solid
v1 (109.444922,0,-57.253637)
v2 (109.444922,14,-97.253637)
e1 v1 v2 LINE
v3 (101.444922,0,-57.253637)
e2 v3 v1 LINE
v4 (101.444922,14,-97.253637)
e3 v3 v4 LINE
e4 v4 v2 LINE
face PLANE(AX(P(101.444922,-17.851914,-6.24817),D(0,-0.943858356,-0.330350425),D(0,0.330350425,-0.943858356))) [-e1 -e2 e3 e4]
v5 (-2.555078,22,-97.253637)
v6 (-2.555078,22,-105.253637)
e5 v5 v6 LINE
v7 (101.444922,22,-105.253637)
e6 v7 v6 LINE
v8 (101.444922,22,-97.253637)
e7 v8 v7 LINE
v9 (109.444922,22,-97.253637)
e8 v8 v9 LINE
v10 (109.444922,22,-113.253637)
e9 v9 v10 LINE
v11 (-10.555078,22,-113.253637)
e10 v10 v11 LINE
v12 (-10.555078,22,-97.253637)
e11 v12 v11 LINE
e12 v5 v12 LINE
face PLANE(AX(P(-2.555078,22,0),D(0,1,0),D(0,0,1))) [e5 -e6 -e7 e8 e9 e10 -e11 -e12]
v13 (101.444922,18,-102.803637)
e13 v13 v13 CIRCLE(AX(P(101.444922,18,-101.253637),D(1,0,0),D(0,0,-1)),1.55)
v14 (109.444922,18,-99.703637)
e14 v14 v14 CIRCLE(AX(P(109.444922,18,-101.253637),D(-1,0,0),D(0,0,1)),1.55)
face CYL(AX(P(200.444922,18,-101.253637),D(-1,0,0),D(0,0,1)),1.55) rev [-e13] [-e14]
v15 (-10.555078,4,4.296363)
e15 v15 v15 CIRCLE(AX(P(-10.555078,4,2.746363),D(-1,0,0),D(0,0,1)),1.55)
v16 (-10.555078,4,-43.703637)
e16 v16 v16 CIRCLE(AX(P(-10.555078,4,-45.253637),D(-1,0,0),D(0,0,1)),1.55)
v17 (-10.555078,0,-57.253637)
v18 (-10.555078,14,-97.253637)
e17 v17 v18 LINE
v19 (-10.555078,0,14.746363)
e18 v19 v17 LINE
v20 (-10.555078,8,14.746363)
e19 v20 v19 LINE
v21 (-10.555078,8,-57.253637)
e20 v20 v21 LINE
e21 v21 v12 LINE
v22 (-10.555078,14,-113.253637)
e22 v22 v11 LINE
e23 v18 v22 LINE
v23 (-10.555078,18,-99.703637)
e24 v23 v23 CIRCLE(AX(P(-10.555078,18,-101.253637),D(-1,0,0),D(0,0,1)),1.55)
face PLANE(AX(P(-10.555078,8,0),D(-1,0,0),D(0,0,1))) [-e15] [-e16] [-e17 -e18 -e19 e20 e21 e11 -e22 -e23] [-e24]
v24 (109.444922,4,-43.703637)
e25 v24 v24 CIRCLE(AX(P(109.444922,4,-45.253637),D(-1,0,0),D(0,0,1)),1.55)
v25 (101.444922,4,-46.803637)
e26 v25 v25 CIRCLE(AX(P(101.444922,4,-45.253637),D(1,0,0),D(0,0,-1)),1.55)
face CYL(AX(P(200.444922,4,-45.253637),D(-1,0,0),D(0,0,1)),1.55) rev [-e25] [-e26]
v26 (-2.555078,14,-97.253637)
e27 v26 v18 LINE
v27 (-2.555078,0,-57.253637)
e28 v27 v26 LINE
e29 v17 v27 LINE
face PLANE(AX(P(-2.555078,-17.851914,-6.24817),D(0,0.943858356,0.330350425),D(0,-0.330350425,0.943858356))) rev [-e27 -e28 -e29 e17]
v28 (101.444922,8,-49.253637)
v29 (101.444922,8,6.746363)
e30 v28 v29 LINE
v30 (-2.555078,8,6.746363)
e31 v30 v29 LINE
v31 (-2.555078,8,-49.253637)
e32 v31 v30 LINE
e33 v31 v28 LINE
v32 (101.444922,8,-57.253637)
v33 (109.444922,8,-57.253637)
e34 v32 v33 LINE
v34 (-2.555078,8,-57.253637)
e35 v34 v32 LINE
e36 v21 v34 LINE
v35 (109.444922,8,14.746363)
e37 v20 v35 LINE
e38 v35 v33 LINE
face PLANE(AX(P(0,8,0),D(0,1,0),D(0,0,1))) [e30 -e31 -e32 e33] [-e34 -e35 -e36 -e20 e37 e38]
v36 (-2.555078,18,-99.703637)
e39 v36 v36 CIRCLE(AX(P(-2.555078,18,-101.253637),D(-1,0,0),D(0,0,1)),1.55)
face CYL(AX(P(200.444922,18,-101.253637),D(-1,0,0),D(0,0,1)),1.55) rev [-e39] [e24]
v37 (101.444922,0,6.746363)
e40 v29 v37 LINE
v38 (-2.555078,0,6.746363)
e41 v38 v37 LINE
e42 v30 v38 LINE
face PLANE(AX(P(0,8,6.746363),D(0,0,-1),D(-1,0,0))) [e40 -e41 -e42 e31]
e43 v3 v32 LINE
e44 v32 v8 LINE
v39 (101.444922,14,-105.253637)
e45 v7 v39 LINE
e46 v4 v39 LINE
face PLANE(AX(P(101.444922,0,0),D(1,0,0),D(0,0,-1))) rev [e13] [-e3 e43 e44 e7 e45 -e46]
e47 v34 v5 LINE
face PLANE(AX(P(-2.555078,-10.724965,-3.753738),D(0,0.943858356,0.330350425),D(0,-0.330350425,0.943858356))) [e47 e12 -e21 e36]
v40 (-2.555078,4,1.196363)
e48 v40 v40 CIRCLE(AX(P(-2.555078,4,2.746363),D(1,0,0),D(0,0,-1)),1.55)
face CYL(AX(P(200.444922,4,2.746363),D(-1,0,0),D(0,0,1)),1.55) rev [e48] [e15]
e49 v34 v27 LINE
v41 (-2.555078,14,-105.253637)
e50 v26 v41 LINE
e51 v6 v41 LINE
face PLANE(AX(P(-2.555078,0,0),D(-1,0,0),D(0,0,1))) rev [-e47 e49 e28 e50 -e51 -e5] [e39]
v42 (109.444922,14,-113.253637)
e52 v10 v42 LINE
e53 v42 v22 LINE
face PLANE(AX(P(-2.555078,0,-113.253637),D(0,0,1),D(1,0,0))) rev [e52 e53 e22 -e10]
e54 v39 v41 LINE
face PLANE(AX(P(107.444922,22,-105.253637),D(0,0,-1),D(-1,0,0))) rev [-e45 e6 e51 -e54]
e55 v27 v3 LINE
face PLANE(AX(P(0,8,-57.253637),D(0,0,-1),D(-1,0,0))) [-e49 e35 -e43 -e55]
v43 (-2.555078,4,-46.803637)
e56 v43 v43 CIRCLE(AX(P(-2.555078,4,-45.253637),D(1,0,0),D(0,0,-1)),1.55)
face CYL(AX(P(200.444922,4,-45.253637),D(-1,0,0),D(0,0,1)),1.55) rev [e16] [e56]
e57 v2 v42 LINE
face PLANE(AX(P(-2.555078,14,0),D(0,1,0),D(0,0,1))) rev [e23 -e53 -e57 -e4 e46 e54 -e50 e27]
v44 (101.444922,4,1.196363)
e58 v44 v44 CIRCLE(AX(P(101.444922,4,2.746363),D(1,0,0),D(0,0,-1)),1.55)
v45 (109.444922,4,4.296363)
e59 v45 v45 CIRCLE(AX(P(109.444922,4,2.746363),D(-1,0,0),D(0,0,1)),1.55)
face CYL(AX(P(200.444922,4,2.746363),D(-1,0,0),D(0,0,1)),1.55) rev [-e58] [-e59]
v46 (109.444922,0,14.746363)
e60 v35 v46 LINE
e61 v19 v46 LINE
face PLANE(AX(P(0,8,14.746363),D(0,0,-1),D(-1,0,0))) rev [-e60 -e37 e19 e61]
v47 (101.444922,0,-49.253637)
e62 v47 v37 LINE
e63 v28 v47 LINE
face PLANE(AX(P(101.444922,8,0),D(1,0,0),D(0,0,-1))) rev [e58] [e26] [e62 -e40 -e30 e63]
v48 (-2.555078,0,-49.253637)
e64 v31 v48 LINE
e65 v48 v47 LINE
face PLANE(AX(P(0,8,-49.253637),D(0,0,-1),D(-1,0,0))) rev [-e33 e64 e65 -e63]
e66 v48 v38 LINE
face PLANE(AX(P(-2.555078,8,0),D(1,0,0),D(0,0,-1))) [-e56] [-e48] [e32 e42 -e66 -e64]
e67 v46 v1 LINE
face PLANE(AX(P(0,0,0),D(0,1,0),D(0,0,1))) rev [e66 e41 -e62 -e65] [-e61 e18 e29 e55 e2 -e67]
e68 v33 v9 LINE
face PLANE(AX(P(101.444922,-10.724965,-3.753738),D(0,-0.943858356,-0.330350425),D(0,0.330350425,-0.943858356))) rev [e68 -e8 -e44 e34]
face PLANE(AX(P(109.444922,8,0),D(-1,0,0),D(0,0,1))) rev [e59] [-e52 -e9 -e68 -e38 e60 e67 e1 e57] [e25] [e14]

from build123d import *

# Parameters (mm, degrees)
BOSS_EXTRUDE1_OUTLINE_W   = 120
BOSS_EXTRUDE1_OUTLINE_H   = 72
BOSS_EXTRUDE1_OUTLINE_W_2 = 104
BOSS_EXTRUDE1_OUTLINE_H_2 = 56
BOSS_EXTRUDE1_DEPTH       = 8
SKETCH3_W                 = 16
SKETCH3_H                 = 8
BOSS_EXTRUDE2_DEPTH       = 8
SKETCH4_W                 = 8
SKETCH4_H                 = 8
BOSS_EXTRUDE3_DEPTH       = 110
SKETCH5_W                 = 16
SKETCH5_H                 = 8
BOSS_EXTRUDE4_DEPTH       = 8
SKETCH6_R                 = 1.55
CUT_EXTRUDE1_DEPTH        = 211


# Read off the part's stored shape, not the designer's step: Boss-Extrude1
with BuildPart() as part:
    # Boss-Extrude1 outline → Boss-Extrude1 (new body)
    with BuildSketch(Plane(origin=(0, 0, 0), x_dir=(1, 0, 0), z_dir=(0, 1, 0))):
        with Locations((49.44492245, 21.253637361)):
            Rectangle(BOSS_EXTRUDE1_OUTLINE_W, BOSS_EXTRUDE1_OUTLINE_H)
        with Locations((49.44492245, 21.253637361)):
            Rectangle(BOSS_EXTRUDE1_OUTLINE_W_2, BOSS_EXTRUDE1_OUTLINE_H_2, mode=Mode.SUBTRACT)
    extrude(amount=BOSS_EXTRUDE1_DEPTH)

    # Sketch3 → Boss-Extrude2 (add)
    with BuildSketch(Plane.ZY.offset(10.55507755)):
        Polygon((-97.253637361, 14), (-97.253637361, 22), (-57.253637361, 8), (-57.253637361, 0), align=None)
        with Locations((-105.253637361, 18)):
            Rectangle(SKETCH3_W, SKETCH3_H)
    extrude(amount=-BOSS_EXTRUDE2_DEPTH)

    # Sketch4 → Boss-Extrude3 (add)
    with BuildSketch(Plane(origin=(-2.55507755, 0, 0), x_dir=(0, 0, -1), z_dir=(1, 0, 0))):
        with Locations((109.253637361, 18)):
            Rectangle(SKETCH4_W, SKETCH4_H)
    extrude(amount=BOSS_EXTRUDE3_DEPTH)

    # Sketch5 → Boss-Extrude4 (add)
    with BuildSketch(Plane(origin=(109.44492245, 0, 0), x_dir=(0, 0, -1), z_dir=(1, 0, 0))):
        Polygon((57.253637361, 0), (97.253637361, 14), (97.253637361, 22), (57.253637361, 8), align=None)
        with Locations((105.253637361, 18)):
            Rectangle(SKETCH5_W, SKETCH5_H)
    extrude(amount=-BOSS_EXTRUDE4_DEPTH)

    # Sketch6 → Cut-Extrude1 (cut)
    with BuildSketch(Plane.ZY.offset(10.55507755)):
        with Locations((2.746362639, 4)):
            Circle(SKETCH6_R)
        with Locations((-45.253637361, 4)):
            Circle(SKETCH6_R)
        with Locations((-101.253637361, 18)):
            Circle(SKETCH6_R)
    extrude(amount=-CUT_EXTRUDE1_DEPTH, mode=Mode.SUBTRACT)


solid = part.part
